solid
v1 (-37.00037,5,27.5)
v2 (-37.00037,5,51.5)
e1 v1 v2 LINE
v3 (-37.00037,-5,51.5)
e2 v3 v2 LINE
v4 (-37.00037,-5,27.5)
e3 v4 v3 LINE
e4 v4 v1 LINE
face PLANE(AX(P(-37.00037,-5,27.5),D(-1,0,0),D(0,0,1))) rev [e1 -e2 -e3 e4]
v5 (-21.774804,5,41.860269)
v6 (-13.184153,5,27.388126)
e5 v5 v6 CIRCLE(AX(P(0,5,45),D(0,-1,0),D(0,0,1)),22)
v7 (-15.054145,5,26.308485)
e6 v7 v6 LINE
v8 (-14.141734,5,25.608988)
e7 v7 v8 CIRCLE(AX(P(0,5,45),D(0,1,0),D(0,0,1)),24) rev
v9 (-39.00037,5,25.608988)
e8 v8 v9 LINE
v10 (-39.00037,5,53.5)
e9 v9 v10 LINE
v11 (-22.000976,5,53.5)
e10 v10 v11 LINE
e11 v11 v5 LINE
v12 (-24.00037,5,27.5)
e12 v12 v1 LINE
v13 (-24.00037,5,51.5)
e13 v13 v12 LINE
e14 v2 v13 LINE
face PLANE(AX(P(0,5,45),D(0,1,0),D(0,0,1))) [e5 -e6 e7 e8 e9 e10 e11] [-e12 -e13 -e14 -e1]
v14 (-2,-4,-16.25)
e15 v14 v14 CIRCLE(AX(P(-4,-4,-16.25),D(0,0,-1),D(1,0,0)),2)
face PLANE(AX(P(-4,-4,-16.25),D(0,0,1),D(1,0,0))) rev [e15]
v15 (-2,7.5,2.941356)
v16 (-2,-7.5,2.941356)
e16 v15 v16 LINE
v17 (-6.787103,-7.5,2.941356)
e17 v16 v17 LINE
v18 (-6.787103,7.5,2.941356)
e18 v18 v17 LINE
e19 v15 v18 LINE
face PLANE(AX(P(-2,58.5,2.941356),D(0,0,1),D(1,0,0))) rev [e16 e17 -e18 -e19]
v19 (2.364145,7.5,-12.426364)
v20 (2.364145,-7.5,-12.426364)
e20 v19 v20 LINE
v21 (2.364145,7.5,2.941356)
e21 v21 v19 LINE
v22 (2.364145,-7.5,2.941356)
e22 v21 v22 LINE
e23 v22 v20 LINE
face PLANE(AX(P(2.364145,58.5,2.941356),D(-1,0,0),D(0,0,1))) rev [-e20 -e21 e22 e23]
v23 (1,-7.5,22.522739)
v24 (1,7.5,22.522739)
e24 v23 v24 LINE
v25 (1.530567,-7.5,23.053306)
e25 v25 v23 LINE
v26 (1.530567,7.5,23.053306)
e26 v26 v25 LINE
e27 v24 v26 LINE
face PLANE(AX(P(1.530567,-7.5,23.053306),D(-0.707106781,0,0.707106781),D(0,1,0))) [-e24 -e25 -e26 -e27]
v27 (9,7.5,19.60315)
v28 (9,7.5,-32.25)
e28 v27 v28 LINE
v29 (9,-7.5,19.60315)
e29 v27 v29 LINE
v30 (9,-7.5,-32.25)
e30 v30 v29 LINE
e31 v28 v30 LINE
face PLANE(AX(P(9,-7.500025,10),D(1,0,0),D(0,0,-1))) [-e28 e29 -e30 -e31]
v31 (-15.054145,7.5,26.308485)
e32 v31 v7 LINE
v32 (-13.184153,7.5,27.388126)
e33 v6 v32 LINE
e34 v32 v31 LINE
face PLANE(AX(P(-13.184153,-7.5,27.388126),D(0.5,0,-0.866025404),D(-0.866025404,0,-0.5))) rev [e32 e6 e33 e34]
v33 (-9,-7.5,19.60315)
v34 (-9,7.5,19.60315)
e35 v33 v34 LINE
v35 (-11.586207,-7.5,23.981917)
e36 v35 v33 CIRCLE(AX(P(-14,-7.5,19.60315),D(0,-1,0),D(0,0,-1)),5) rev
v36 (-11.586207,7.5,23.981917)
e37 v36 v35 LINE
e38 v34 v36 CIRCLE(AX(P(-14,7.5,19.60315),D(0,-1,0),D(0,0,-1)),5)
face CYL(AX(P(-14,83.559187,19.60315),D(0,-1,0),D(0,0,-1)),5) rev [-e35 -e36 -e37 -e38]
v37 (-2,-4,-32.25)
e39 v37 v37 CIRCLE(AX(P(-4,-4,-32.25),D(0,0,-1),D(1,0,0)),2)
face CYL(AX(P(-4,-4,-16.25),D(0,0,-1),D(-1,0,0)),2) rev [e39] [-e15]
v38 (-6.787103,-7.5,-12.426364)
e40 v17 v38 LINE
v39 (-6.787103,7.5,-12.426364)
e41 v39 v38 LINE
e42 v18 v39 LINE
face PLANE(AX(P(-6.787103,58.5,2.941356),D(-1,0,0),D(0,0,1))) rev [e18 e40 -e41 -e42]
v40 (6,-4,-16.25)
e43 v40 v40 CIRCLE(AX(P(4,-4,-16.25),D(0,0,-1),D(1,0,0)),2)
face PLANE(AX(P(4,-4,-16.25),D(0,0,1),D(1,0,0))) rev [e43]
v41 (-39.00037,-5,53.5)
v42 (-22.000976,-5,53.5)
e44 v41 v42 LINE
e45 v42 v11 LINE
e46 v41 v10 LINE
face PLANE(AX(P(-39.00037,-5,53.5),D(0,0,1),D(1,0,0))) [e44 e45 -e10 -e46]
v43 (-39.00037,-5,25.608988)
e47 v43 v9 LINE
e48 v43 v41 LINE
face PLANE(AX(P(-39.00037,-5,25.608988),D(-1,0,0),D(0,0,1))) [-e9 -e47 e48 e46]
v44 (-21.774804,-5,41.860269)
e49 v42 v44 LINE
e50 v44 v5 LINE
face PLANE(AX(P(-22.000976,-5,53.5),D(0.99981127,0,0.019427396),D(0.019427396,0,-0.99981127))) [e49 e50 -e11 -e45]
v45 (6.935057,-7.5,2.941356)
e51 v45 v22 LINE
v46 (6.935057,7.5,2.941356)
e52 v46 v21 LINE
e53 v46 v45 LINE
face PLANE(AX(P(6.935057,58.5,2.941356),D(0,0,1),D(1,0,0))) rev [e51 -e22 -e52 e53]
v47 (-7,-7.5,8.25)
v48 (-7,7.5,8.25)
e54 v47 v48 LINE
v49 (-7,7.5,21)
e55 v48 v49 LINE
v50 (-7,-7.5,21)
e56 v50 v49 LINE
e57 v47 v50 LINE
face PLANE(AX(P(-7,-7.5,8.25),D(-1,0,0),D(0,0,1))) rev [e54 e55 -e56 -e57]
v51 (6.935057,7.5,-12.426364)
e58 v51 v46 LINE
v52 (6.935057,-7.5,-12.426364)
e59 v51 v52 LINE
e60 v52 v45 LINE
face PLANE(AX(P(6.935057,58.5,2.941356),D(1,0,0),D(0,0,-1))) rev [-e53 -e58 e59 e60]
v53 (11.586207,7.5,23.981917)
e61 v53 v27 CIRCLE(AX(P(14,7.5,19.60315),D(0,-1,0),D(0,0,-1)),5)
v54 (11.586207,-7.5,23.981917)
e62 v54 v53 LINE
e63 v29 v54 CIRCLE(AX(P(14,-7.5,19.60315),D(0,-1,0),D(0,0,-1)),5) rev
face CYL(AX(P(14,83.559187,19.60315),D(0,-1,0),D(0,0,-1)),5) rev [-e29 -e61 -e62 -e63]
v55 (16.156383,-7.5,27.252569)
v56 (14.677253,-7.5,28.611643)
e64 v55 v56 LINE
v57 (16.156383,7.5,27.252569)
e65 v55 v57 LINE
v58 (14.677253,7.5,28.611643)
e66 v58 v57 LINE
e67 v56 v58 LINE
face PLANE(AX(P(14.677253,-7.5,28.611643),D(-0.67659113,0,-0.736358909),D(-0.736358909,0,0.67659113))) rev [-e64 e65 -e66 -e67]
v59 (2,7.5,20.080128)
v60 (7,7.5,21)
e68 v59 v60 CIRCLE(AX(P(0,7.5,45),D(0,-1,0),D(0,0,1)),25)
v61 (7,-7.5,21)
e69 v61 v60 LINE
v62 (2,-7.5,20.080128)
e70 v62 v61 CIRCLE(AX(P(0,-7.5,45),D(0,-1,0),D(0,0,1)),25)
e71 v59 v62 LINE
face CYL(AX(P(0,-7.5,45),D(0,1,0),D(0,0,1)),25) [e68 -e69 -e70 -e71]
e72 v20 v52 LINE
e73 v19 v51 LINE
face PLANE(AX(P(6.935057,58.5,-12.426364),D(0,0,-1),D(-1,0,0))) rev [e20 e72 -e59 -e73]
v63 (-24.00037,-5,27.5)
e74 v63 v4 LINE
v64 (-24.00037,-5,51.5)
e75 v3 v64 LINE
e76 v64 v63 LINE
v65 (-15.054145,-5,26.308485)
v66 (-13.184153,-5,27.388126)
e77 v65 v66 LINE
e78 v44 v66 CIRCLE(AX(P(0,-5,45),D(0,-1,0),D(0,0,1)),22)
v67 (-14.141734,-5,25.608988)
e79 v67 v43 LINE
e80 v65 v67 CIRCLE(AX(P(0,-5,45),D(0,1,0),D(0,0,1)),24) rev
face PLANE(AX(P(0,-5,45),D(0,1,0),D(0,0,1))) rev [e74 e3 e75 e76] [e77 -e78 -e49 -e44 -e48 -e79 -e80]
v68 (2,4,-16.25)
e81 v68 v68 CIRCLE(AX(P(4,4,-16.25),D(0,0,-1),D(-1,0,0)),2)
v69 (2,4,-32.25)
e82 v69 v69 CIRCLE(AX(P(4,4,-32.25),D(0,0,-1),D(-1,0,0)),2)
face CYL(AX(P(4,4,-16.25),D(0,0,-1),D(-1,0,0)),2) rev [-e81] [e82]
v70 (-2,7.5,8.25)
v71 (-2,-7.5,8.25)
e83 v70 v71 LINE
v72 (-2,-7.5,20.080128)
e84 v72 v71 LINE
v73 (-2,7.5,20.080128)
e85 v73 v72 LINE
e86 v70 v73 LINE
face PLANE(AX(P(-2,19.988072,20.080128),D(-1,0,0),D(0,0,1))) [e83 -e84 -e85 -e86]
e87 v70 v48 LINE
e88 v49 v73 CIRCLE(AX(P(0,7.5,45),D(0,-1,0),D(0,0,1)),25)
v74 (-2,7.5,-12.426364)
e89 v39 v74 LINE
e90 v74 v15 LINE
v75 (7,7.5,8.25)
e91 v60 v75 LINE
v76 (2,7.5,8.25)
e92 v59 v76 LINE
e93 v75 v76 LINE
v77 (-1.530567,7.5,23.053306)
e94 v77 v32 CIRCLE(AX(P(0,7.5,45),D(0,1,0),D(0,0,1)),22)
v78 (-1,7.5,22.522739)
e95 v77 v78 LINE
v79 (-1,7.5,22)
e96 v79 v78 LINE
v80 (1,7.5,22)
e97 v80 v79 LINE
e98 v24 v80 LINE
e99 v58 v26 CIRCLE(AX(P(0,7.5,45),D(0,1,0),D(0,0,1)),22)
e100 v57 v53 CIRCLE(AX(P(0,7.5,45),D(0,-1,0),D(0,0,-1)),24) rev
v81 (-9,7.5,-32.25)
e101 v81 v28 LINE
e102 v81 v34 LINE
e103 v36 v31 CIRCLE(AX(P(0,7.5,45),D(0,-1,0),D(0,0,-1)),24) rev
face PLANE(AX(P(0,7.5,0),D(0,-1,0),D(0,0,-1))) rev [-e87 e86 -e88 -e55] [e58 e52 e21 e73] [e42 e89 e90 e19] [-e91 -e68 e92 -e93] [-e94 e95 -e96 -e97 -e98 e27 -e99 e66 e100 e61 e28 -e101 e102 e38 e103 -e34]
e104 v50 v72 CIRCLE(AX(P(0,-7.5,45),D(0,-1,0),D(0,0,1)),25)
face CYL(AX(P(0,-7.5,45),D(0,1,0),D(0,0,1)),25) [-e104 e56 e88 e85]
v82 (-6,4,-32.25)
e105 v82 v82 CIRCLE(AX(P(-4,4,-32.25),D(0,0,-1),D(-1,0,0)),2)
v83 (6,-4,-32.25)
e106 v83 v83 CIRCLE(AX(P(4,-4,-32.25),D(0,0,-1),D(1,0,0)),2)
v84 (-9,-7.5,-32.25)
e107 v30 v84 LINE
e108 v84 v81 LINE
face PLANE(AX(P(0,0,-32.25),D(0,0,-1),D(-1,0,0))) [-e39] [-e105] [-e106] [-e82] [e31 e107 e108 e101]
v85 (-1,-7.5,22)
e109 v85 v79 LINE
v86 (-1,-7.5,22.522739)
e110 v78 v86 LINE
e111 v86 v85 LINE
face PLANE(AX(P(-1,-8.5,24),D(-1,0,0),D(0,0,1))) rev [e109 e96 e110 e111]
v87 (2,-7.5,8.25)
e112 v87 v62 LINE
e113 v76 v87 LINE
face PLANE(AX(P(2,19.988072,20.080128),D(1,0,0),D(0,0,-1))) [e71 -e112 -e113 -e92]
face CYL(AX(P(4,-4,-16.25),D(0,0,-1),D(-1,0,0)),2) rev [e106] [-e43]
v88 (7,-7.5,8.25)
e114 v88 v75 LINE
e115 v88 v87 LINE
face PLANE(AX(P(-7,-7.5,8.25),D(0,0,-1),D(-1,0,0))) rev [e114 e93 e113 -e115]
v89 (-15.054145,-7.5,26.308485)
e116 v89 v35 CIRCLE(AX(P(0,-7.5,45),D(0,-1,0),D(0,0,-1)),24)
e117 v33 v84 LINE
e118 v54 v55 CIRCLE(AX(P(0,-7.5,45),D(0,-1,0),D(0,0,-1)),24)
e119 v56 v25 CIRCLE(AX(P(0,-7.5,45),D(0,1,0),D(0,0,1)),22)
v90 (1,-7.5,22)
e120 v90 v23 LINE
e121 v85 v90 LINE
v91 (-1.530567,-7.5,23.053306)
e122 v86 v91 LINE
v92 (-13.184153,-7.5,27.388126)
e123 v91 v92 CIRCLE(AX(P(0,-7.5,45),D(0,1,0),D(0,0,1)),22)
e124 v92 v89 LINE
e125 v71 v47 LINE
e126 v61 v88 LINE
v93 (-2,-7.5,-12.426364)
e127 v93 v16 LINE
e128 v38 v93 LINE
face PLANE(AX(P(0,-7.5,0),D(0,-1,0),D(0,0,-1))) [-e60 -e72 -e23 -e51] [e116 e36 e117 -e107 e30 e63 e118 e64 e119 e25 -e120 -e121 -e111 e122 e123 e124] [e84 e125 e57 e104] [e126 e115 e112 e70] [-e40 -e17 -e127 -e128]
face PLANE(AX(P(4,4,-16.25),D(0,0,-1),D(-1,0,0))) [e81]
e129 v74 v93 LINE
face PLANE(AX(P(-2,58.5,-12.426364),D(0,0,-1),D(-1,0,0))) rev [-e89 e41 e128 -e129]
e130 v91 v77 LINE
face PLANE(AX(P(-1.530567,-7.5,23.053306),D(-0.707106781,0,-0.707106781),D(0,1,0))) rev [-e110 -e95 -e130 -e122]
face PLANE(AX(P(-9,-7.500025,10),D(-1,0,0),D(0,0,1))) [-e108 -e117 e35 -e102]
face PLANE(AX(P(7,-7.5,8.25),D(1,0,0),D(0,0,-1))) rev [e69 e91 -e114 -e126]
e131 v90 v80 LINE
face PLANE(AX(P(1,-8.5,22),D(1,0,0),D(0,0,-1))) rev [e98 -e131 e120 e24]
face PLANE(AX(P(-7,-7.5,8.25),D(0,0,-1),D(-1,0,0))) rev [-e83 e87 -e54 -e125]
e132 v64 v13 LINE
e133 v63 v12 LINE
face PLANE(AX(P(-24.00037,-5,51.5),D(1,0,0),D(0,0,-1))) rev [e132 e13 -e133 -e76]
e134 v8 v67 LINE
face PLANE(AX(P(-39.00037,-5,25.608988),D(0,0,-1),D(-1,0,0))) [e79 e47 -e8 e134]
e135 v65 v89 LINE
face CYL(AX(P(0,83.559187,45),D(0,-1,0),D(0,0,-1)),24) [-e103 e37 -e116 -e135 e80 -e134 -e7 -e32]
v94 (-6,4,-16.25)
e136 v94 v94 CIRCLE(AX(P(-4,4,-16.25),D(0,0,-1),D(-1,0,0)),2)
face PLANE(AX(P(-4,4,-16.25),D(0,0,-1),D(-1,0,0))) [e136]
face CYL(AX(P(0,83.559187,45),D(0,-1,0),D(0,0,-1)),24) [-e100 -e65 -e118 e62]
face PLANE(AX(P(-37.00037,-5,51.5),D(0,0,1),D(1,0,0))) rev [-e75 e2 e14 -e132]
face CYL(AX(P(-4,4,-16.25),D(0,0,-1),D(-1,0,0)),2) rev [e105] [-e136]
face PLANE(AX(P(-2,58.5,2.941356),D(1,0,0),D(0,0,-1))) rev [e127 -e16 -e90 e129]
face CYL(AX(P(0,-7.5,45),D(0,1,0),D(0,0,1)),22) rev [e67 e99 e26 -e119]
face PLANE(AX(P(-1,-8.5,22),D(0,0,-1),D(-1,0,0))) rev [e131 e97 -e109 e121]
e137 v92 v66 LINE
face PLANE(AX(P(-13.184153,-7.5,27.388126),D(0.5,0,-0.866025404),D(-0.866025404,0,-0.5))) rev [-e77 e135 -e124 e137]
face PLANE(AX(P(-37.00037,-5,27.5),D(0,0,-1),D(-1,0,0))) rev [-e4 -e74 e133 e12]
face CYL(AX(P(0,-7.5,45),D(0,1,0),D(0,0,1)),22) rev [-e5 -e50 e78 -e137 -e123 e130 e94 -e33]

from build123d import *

# Parameters (mm, degrees)
SKETCH_1_W           = 20
SKETCH_1_H           = 20
SKETCH_1_W_2         = 11.5
SKETCH_1_H_2         = 11.5
EXTRUDE_1_DEPTH      = 7.5
EXTRUDE_2_DEPTH      = 20
SKETCH_4_W           = 6
SKETCH_4_H           = 17.5
CUT_EXTRUDE_1_DEPTH  = 33.882366095
SKETCH_5_R           = 2
CUT_EXTRUDE_2_DEPTH  = 35.820970693
SKETCH_6_OUTSIDE_W   = 31.014
SKETCH_6_OUTSIDE_H   = 48.514
SKETCH_6_OUTSIDE_W_2 = 18
SKETCH_6_OUTSIDE_H_2 = 37.5
CUT_EXTRUDE_5_DEPTH  = 33.882366095
EXTRUDE_3_DEPTH      = 15
CUT_EXTRUDE_6_DEPTH  = 75.578817368
CUT_EXTRUDE_9_DEPTH  = 37.120005833
SKETCH_12_W          = 2
SKETCH_12_H          = 2
CUT_EXTRUDE_10_DEPTH = 16
EXTRUDE_START        = -15
EXTRUDE_4_DEPTH      = 15
SKETCH_14_W          = 13
SKETCH_14_H          = 24
EXTRUDE_5_DEPTH      = 5
FILLET_3_R           = 5
CHAMFER_1_SIZE       = 0.5
CUT_EXTRUDE_11_DEPTH = 64
SKETCH_16_W          = 18
SKETCH_16_H          = 15
EXTRUDE_6_DEPTH      = 3
SKETCH_17_W          = 18
SKETCH_17_H          = 15
EXTRUDE_7_DEPTH      = 35
SKETCH_18_W          = 4.570911685
SKETCH_18_H          = 15.367720323
SKETCH_18_W_2        = 4.787102878
CUT_EXTRUDE_12_DEPTH = 66
SKETCH_19_R          = 2
CUT_EXTRUDE_13_DEPTH = 16


with BuildPart() as part:
    # 草图1 → 凸台-拉伸1 (new, symmetric)
    with BuildSketch(Plane(origin=(0, 0, 0), x_dir=(1, 0, 0), z_dir=(0, 1, 0))):
        Rectangle(SKETCH_1_W, SKETCH_1_H)
        Rectangle(SKETCH_1_W_2, SKETCH_1_H_2, mode=Mode.SUBTRACT)
    extrude(amount=EXTRUDE_1_DEPTH, both=True)

    # 草图3 → 凸台-拉伸2 (add)
    with BuildSketch(Plane.ZY.offset(10)):
        with BuildLine():
            Line((-10, -5), (-14.409830056, -5))
            ThreePointArc((-14.409830056, -5), (-27.5, 0), (-14.409830056, 5))
            Line((-14.409830056, 5), (-10, 5))
            Line((-10, 5), (-10, -5))
        make_face()
    extrude(amount=-EXTRUDE_2_DEPTH)

    # 草图4 → 切除-拉伸1 (cut, through all)
    with BuildSketch(Plane(origin=(0, 7.5, 0), x_dir=(1, 0, 0), z_dir=(0, 1, 0))):
        with Locations((-0.204363536, 18.75)):
            Rectangle(SKETCH_4_W, SKETCH_4_H)
    extrude(amount=-CUT_EXTRUDE_1_DEPTH, mode=Mode.SUBTRACT)

    # 草图5 → 切除-拉伸2 (cut, through all)
    with BuildSketch(Plane.ZY.offset(10)):
        with Locations((-20, 0)):
            Circle(SKETCH_5_R)
    extrude(amount=-CUT_EXTRUDE_2_DEPTH, mode=Mode.SUBTRACT)

    # 草图6 outside → 切除-拉伸5 (cut, through all)
    with BuildSketch(Plane(origin=(0, 7.5, 0), x_dir=(1, 0, 0), z_dir=(0, 1, 0))):
        with Locations((0, 8.75)):
            Rectangle(SKETCH_6_OUTSIDE_W, SKETCH_6_OUTSIDE_H)
        with Locations((0, 8.75)):
            Rectangle(SKETCH_6_OUTSIDE_W_2, SKETCH_6_OUTSIDE_H_2, mode=Mode.SUBTRACT)
    extrude(amount=-CUT_EXTRUDE_5_DEPTH, mode=Mode.SUBTRACT)


with BuildPart() as body_2:
    # 草图7 → 凸台-拉伸3 (new body)
    with BuildSketch(Plane.XZ.offset(7.5)):
        with BuildLine():
            Line((-9, 10), (-9, 22.751404539))
            ThreePointArc((-9, 22.751404539), (0, 69), (9, 22.751404539))
            Line((9, 22.751404539), (9, 10))
            Line((9, 10), (-9, 10))
        make_face()
    extrude(amount=-EXTRUDE_3_DEPTH)

    # 草图10 → 切除-拉伸6 (cut, through all)
    with BuildSketch(Plane(origin=(0, 7.5, 0), x_dir=(1, 0, 0), z_dir=(0, 1, 0))):
        with BuildLine():
            Line((-13.184152869, -27.388125792), (-20.784609691, -23))
            ThreePointArc((-20.784609691, -23), (0, -75.265491901), (20.784609691, -23))
            Line((20.784609691, -23), (14.677253023, -28.611643044))
            ThreePointArc((14.677253023, -28.611643044), (0.965186839, -23.021182599), (-13.184152869, -27.388125792))
        make_face()
    extrude(amount=-CUT_EXTRUDE_6_DEPTH, mode=Mode.SUBTRACT)


with BuildPart() as part_1:
    add(part.part)

    # Combine 1: union body 2
    add(body_2.part)

    # 草图11 → 切除-拉伸9 (cut, through all)
    with BuildSketch(Plane(origin=(0, 7.5, 0), x_dir=(1, 0, 0), z_dir=(0, 1, 0))):
        with BuildLine():
            Line((-7, -8.25), (7, -8.25))
            Line((7, -8.25), (7, -21))
            ThreePointArc((7, -21), (0, -20), (-7, -21))
            Line((-7, -21), (-7, -8.25))
        make_face()
    extrude(amount=-CUT_EXTRUDE_9_DEPTH, mode=Mode.SUBTRACT)

    # 草图12 → 切除-拉伸10 (cut)
    with BuildSketch(Plane(origin=(0, 7.5, 0), x_dir=(1, 0, 0), z_dir=(0, 1, 0))):
        with Locations((0, -23)):
            Rectangle(SKETCH_12_W, SKETCH_12_H)
    extrude(amount=-CUT_EXTRUDE_10_DEPTH, mode=Mode.SUBTRACT)

    # 草图13 → 凸台-拉伸4 (add)
    with BuildSketch(Plane.XZ.offset(7.5).offset(EXTRUDE_START)):
        with BuildLine():
            Line((-2, 20.080128411), (-2, 8.25))
            Line((-2, 8.25), (2, 8.25))
            Line((2, 8.25), (2, 20.080128411))
            ThreePointArc((2, 20.080128411), (0, 20), (-2, 20.080128411))
        make_face()
    extrude(amount=EXTRUDE_4_DEPTH)

    # 草图14 → 凸台-拉伸5 (add, symmetric)
    with BuildSketch(Plane(origin=(0, 0, 0), x_dir=(1, 0, 0), z_dir=(0, 1, 0))):
        with BuildLine():
            Line((-39.000369788, -25.608987518), (-10.391758029, -25.608987518))
            ThreePointArc((-10.391758029, -25.608987518), (-18.019377527, -32.37850906), (-21.774804011, -41.860269078))
            Line((-21.774804011, -41.860269078), (-22.000976364, -53.5))
            Line((-22.000976364, -53.5), (-39.000369788, -53.5))
            Line((-39.000369788, -53.5), (-39.000369788, -25.608987518))
        make_face()
        with Locations((-30.500369788, -39.5)):
            Rectangle(SKETCH_14_W, SKETCH_14_H, mode=Mode.SUBTRACT)
    extrude(amount=EXTRUDE_5_DEPTH, both=True)

    # 圆角3
    fillet_3_edges = [part_1.edges().sort_by_distance(p)[0] for p in [
        (-9, 0, 22.751404539),
        (9, 0, 22.751404539),
    ]]
    fillet(fillet_3_edges, radius=FILLET_3_R)

    # 倒角1
    # the kernel refuses this chamfer: 0.524377325, 0.5 mm, written as the material it takes off along each edge
    with BuildSketch(Plane(origin=(1, -8.868212894, 23.022739024), x_dir=(0.9983445219574435, 0, 0.05751708856995105), z_dir=(0, 1, 0))) as chamfer_1_piece_1:
        with BuildLine():
            Line((0.531447088, 0), (-CHAMFER_1_SIZE * 0.05751708857, CHAMFER_1_SIZE * 0.998344521957))
            Line((-CHAMFER_1_SIZE * 0.05751708857, CHAMFER_1_SIZE * 0.998344521957), (0, 0))
            ThreePointArc((0, 0), (0.273556674, 0.001603414), (0.531447088, 0))
        make_face()
    extrude(amount=17.736425787, mode=Mode.SUBTRACT)
    with BuildSketch(Plane(origin=(-1, -8.868212894, 23.022739024), x_dir=(-0.9983445219574435, 0, 0.05751708856995064), z_dir=(0, 1, 0))) as chamfer_1_piece_2:
        with BuildLine():
            Line((0.531447088, 0), (-CHAMFER_1_SIZE * 0.05751708857, -CHAMFER_1_SIZE * 0.998344521957))
            Line((-CHAMFER_1_SIZE * 0.05751708857, -CHAMFER_1_SIZE * 0.998344521957), (0, 0))
            ThreePointArc((0, 0), (0.273556674, -0.001603414), (0.531447088, 0))
        make_face()
    extrude(amount=17.736425787, mode=Mode.SUBTRACT)

    # 草图15 → 切除-拉伸11 (cut)
    with BuildSketch(Plane(origin=(0, 7.5, 0), x_dir=(1, 0, 0), z_dir=(0, 1, 0))):
        Polygon((-5.75, -5.75), (20.030525029, -5.75), (22.202632228, 33.927378984), (-42.503618679, 32.062961585), (-42.503618679, 30.637230633), (-36.910366482, 4.316043823), (-9, -5.75), align=None)
    extrude(amount=-CUT_EXTRUDE_11_DEPTH, mode=Mode.SUBTRACT)

    # 草图16 → 凸台-拉伸6 (add)
    with BuildSketch(Plane(origin=(0, 0, 5.75), x_dir=(-1, 0, 0), z_dir=(0, 0, -1))):
        Rectangle(SKETCH_16_W, SKETCH_16_H)
    extrude(amount=EXTRUDE_6_DEPTH)

    # 草图17 → 凸台-拉伸7 (add)
    with BuildSketch(Plane(origin=(0, 0, 2.75), x_dir=(-1, 0, 0), z_dir=(0, 0, -1))):
        Rectangle(SKETCH_17_W, SKETCH_17_H)
    extrude(amount=EXTRUDE_7_DEPTH)

    # 草图18 → 切除-拉伸12 (cut)
    with BuildSketch(Plane.XZ.offset(7.5)):
        with Locations((4.649601127, -4.742503957)):
            Rectangle(SKETCH_18_W, SKETCH_18_H)
        with Locations((-4.393551439, -4.742503957)):
            Rectangle(SKETCH_18_W_2, SKETCH_18_H)
    extrude(amount=-CUT_EXTRUDE_12_DEPTH, mode=Mode.SUBTRACT)

    # 草图19 → 切除-拉伸13 (cut)
    with BuildSketch(Plane(origin=(0, 0, -32.25), x_dir=(-1, 0, 0), z_dir=(0, 0, -1))):
        with Locations((-4, 4)):
            Circle(SKETCH_19_R)
        with Locations((4, 4)):
            Circle(SKETCH_19_R)
        with Locations(Location((4, -4, 0), (0, 0, 180))):
            Circle(SKETCH_19_R)
        with Locations(Location((-4, -4, 0), (0, 0, 180))):
            Circle(SKETCH_19_R)
    extrude(amount=-CUT_EXTRUDE_13_DEPTH, mode=Mode.SUBTRACT)


solid = part_1.part
